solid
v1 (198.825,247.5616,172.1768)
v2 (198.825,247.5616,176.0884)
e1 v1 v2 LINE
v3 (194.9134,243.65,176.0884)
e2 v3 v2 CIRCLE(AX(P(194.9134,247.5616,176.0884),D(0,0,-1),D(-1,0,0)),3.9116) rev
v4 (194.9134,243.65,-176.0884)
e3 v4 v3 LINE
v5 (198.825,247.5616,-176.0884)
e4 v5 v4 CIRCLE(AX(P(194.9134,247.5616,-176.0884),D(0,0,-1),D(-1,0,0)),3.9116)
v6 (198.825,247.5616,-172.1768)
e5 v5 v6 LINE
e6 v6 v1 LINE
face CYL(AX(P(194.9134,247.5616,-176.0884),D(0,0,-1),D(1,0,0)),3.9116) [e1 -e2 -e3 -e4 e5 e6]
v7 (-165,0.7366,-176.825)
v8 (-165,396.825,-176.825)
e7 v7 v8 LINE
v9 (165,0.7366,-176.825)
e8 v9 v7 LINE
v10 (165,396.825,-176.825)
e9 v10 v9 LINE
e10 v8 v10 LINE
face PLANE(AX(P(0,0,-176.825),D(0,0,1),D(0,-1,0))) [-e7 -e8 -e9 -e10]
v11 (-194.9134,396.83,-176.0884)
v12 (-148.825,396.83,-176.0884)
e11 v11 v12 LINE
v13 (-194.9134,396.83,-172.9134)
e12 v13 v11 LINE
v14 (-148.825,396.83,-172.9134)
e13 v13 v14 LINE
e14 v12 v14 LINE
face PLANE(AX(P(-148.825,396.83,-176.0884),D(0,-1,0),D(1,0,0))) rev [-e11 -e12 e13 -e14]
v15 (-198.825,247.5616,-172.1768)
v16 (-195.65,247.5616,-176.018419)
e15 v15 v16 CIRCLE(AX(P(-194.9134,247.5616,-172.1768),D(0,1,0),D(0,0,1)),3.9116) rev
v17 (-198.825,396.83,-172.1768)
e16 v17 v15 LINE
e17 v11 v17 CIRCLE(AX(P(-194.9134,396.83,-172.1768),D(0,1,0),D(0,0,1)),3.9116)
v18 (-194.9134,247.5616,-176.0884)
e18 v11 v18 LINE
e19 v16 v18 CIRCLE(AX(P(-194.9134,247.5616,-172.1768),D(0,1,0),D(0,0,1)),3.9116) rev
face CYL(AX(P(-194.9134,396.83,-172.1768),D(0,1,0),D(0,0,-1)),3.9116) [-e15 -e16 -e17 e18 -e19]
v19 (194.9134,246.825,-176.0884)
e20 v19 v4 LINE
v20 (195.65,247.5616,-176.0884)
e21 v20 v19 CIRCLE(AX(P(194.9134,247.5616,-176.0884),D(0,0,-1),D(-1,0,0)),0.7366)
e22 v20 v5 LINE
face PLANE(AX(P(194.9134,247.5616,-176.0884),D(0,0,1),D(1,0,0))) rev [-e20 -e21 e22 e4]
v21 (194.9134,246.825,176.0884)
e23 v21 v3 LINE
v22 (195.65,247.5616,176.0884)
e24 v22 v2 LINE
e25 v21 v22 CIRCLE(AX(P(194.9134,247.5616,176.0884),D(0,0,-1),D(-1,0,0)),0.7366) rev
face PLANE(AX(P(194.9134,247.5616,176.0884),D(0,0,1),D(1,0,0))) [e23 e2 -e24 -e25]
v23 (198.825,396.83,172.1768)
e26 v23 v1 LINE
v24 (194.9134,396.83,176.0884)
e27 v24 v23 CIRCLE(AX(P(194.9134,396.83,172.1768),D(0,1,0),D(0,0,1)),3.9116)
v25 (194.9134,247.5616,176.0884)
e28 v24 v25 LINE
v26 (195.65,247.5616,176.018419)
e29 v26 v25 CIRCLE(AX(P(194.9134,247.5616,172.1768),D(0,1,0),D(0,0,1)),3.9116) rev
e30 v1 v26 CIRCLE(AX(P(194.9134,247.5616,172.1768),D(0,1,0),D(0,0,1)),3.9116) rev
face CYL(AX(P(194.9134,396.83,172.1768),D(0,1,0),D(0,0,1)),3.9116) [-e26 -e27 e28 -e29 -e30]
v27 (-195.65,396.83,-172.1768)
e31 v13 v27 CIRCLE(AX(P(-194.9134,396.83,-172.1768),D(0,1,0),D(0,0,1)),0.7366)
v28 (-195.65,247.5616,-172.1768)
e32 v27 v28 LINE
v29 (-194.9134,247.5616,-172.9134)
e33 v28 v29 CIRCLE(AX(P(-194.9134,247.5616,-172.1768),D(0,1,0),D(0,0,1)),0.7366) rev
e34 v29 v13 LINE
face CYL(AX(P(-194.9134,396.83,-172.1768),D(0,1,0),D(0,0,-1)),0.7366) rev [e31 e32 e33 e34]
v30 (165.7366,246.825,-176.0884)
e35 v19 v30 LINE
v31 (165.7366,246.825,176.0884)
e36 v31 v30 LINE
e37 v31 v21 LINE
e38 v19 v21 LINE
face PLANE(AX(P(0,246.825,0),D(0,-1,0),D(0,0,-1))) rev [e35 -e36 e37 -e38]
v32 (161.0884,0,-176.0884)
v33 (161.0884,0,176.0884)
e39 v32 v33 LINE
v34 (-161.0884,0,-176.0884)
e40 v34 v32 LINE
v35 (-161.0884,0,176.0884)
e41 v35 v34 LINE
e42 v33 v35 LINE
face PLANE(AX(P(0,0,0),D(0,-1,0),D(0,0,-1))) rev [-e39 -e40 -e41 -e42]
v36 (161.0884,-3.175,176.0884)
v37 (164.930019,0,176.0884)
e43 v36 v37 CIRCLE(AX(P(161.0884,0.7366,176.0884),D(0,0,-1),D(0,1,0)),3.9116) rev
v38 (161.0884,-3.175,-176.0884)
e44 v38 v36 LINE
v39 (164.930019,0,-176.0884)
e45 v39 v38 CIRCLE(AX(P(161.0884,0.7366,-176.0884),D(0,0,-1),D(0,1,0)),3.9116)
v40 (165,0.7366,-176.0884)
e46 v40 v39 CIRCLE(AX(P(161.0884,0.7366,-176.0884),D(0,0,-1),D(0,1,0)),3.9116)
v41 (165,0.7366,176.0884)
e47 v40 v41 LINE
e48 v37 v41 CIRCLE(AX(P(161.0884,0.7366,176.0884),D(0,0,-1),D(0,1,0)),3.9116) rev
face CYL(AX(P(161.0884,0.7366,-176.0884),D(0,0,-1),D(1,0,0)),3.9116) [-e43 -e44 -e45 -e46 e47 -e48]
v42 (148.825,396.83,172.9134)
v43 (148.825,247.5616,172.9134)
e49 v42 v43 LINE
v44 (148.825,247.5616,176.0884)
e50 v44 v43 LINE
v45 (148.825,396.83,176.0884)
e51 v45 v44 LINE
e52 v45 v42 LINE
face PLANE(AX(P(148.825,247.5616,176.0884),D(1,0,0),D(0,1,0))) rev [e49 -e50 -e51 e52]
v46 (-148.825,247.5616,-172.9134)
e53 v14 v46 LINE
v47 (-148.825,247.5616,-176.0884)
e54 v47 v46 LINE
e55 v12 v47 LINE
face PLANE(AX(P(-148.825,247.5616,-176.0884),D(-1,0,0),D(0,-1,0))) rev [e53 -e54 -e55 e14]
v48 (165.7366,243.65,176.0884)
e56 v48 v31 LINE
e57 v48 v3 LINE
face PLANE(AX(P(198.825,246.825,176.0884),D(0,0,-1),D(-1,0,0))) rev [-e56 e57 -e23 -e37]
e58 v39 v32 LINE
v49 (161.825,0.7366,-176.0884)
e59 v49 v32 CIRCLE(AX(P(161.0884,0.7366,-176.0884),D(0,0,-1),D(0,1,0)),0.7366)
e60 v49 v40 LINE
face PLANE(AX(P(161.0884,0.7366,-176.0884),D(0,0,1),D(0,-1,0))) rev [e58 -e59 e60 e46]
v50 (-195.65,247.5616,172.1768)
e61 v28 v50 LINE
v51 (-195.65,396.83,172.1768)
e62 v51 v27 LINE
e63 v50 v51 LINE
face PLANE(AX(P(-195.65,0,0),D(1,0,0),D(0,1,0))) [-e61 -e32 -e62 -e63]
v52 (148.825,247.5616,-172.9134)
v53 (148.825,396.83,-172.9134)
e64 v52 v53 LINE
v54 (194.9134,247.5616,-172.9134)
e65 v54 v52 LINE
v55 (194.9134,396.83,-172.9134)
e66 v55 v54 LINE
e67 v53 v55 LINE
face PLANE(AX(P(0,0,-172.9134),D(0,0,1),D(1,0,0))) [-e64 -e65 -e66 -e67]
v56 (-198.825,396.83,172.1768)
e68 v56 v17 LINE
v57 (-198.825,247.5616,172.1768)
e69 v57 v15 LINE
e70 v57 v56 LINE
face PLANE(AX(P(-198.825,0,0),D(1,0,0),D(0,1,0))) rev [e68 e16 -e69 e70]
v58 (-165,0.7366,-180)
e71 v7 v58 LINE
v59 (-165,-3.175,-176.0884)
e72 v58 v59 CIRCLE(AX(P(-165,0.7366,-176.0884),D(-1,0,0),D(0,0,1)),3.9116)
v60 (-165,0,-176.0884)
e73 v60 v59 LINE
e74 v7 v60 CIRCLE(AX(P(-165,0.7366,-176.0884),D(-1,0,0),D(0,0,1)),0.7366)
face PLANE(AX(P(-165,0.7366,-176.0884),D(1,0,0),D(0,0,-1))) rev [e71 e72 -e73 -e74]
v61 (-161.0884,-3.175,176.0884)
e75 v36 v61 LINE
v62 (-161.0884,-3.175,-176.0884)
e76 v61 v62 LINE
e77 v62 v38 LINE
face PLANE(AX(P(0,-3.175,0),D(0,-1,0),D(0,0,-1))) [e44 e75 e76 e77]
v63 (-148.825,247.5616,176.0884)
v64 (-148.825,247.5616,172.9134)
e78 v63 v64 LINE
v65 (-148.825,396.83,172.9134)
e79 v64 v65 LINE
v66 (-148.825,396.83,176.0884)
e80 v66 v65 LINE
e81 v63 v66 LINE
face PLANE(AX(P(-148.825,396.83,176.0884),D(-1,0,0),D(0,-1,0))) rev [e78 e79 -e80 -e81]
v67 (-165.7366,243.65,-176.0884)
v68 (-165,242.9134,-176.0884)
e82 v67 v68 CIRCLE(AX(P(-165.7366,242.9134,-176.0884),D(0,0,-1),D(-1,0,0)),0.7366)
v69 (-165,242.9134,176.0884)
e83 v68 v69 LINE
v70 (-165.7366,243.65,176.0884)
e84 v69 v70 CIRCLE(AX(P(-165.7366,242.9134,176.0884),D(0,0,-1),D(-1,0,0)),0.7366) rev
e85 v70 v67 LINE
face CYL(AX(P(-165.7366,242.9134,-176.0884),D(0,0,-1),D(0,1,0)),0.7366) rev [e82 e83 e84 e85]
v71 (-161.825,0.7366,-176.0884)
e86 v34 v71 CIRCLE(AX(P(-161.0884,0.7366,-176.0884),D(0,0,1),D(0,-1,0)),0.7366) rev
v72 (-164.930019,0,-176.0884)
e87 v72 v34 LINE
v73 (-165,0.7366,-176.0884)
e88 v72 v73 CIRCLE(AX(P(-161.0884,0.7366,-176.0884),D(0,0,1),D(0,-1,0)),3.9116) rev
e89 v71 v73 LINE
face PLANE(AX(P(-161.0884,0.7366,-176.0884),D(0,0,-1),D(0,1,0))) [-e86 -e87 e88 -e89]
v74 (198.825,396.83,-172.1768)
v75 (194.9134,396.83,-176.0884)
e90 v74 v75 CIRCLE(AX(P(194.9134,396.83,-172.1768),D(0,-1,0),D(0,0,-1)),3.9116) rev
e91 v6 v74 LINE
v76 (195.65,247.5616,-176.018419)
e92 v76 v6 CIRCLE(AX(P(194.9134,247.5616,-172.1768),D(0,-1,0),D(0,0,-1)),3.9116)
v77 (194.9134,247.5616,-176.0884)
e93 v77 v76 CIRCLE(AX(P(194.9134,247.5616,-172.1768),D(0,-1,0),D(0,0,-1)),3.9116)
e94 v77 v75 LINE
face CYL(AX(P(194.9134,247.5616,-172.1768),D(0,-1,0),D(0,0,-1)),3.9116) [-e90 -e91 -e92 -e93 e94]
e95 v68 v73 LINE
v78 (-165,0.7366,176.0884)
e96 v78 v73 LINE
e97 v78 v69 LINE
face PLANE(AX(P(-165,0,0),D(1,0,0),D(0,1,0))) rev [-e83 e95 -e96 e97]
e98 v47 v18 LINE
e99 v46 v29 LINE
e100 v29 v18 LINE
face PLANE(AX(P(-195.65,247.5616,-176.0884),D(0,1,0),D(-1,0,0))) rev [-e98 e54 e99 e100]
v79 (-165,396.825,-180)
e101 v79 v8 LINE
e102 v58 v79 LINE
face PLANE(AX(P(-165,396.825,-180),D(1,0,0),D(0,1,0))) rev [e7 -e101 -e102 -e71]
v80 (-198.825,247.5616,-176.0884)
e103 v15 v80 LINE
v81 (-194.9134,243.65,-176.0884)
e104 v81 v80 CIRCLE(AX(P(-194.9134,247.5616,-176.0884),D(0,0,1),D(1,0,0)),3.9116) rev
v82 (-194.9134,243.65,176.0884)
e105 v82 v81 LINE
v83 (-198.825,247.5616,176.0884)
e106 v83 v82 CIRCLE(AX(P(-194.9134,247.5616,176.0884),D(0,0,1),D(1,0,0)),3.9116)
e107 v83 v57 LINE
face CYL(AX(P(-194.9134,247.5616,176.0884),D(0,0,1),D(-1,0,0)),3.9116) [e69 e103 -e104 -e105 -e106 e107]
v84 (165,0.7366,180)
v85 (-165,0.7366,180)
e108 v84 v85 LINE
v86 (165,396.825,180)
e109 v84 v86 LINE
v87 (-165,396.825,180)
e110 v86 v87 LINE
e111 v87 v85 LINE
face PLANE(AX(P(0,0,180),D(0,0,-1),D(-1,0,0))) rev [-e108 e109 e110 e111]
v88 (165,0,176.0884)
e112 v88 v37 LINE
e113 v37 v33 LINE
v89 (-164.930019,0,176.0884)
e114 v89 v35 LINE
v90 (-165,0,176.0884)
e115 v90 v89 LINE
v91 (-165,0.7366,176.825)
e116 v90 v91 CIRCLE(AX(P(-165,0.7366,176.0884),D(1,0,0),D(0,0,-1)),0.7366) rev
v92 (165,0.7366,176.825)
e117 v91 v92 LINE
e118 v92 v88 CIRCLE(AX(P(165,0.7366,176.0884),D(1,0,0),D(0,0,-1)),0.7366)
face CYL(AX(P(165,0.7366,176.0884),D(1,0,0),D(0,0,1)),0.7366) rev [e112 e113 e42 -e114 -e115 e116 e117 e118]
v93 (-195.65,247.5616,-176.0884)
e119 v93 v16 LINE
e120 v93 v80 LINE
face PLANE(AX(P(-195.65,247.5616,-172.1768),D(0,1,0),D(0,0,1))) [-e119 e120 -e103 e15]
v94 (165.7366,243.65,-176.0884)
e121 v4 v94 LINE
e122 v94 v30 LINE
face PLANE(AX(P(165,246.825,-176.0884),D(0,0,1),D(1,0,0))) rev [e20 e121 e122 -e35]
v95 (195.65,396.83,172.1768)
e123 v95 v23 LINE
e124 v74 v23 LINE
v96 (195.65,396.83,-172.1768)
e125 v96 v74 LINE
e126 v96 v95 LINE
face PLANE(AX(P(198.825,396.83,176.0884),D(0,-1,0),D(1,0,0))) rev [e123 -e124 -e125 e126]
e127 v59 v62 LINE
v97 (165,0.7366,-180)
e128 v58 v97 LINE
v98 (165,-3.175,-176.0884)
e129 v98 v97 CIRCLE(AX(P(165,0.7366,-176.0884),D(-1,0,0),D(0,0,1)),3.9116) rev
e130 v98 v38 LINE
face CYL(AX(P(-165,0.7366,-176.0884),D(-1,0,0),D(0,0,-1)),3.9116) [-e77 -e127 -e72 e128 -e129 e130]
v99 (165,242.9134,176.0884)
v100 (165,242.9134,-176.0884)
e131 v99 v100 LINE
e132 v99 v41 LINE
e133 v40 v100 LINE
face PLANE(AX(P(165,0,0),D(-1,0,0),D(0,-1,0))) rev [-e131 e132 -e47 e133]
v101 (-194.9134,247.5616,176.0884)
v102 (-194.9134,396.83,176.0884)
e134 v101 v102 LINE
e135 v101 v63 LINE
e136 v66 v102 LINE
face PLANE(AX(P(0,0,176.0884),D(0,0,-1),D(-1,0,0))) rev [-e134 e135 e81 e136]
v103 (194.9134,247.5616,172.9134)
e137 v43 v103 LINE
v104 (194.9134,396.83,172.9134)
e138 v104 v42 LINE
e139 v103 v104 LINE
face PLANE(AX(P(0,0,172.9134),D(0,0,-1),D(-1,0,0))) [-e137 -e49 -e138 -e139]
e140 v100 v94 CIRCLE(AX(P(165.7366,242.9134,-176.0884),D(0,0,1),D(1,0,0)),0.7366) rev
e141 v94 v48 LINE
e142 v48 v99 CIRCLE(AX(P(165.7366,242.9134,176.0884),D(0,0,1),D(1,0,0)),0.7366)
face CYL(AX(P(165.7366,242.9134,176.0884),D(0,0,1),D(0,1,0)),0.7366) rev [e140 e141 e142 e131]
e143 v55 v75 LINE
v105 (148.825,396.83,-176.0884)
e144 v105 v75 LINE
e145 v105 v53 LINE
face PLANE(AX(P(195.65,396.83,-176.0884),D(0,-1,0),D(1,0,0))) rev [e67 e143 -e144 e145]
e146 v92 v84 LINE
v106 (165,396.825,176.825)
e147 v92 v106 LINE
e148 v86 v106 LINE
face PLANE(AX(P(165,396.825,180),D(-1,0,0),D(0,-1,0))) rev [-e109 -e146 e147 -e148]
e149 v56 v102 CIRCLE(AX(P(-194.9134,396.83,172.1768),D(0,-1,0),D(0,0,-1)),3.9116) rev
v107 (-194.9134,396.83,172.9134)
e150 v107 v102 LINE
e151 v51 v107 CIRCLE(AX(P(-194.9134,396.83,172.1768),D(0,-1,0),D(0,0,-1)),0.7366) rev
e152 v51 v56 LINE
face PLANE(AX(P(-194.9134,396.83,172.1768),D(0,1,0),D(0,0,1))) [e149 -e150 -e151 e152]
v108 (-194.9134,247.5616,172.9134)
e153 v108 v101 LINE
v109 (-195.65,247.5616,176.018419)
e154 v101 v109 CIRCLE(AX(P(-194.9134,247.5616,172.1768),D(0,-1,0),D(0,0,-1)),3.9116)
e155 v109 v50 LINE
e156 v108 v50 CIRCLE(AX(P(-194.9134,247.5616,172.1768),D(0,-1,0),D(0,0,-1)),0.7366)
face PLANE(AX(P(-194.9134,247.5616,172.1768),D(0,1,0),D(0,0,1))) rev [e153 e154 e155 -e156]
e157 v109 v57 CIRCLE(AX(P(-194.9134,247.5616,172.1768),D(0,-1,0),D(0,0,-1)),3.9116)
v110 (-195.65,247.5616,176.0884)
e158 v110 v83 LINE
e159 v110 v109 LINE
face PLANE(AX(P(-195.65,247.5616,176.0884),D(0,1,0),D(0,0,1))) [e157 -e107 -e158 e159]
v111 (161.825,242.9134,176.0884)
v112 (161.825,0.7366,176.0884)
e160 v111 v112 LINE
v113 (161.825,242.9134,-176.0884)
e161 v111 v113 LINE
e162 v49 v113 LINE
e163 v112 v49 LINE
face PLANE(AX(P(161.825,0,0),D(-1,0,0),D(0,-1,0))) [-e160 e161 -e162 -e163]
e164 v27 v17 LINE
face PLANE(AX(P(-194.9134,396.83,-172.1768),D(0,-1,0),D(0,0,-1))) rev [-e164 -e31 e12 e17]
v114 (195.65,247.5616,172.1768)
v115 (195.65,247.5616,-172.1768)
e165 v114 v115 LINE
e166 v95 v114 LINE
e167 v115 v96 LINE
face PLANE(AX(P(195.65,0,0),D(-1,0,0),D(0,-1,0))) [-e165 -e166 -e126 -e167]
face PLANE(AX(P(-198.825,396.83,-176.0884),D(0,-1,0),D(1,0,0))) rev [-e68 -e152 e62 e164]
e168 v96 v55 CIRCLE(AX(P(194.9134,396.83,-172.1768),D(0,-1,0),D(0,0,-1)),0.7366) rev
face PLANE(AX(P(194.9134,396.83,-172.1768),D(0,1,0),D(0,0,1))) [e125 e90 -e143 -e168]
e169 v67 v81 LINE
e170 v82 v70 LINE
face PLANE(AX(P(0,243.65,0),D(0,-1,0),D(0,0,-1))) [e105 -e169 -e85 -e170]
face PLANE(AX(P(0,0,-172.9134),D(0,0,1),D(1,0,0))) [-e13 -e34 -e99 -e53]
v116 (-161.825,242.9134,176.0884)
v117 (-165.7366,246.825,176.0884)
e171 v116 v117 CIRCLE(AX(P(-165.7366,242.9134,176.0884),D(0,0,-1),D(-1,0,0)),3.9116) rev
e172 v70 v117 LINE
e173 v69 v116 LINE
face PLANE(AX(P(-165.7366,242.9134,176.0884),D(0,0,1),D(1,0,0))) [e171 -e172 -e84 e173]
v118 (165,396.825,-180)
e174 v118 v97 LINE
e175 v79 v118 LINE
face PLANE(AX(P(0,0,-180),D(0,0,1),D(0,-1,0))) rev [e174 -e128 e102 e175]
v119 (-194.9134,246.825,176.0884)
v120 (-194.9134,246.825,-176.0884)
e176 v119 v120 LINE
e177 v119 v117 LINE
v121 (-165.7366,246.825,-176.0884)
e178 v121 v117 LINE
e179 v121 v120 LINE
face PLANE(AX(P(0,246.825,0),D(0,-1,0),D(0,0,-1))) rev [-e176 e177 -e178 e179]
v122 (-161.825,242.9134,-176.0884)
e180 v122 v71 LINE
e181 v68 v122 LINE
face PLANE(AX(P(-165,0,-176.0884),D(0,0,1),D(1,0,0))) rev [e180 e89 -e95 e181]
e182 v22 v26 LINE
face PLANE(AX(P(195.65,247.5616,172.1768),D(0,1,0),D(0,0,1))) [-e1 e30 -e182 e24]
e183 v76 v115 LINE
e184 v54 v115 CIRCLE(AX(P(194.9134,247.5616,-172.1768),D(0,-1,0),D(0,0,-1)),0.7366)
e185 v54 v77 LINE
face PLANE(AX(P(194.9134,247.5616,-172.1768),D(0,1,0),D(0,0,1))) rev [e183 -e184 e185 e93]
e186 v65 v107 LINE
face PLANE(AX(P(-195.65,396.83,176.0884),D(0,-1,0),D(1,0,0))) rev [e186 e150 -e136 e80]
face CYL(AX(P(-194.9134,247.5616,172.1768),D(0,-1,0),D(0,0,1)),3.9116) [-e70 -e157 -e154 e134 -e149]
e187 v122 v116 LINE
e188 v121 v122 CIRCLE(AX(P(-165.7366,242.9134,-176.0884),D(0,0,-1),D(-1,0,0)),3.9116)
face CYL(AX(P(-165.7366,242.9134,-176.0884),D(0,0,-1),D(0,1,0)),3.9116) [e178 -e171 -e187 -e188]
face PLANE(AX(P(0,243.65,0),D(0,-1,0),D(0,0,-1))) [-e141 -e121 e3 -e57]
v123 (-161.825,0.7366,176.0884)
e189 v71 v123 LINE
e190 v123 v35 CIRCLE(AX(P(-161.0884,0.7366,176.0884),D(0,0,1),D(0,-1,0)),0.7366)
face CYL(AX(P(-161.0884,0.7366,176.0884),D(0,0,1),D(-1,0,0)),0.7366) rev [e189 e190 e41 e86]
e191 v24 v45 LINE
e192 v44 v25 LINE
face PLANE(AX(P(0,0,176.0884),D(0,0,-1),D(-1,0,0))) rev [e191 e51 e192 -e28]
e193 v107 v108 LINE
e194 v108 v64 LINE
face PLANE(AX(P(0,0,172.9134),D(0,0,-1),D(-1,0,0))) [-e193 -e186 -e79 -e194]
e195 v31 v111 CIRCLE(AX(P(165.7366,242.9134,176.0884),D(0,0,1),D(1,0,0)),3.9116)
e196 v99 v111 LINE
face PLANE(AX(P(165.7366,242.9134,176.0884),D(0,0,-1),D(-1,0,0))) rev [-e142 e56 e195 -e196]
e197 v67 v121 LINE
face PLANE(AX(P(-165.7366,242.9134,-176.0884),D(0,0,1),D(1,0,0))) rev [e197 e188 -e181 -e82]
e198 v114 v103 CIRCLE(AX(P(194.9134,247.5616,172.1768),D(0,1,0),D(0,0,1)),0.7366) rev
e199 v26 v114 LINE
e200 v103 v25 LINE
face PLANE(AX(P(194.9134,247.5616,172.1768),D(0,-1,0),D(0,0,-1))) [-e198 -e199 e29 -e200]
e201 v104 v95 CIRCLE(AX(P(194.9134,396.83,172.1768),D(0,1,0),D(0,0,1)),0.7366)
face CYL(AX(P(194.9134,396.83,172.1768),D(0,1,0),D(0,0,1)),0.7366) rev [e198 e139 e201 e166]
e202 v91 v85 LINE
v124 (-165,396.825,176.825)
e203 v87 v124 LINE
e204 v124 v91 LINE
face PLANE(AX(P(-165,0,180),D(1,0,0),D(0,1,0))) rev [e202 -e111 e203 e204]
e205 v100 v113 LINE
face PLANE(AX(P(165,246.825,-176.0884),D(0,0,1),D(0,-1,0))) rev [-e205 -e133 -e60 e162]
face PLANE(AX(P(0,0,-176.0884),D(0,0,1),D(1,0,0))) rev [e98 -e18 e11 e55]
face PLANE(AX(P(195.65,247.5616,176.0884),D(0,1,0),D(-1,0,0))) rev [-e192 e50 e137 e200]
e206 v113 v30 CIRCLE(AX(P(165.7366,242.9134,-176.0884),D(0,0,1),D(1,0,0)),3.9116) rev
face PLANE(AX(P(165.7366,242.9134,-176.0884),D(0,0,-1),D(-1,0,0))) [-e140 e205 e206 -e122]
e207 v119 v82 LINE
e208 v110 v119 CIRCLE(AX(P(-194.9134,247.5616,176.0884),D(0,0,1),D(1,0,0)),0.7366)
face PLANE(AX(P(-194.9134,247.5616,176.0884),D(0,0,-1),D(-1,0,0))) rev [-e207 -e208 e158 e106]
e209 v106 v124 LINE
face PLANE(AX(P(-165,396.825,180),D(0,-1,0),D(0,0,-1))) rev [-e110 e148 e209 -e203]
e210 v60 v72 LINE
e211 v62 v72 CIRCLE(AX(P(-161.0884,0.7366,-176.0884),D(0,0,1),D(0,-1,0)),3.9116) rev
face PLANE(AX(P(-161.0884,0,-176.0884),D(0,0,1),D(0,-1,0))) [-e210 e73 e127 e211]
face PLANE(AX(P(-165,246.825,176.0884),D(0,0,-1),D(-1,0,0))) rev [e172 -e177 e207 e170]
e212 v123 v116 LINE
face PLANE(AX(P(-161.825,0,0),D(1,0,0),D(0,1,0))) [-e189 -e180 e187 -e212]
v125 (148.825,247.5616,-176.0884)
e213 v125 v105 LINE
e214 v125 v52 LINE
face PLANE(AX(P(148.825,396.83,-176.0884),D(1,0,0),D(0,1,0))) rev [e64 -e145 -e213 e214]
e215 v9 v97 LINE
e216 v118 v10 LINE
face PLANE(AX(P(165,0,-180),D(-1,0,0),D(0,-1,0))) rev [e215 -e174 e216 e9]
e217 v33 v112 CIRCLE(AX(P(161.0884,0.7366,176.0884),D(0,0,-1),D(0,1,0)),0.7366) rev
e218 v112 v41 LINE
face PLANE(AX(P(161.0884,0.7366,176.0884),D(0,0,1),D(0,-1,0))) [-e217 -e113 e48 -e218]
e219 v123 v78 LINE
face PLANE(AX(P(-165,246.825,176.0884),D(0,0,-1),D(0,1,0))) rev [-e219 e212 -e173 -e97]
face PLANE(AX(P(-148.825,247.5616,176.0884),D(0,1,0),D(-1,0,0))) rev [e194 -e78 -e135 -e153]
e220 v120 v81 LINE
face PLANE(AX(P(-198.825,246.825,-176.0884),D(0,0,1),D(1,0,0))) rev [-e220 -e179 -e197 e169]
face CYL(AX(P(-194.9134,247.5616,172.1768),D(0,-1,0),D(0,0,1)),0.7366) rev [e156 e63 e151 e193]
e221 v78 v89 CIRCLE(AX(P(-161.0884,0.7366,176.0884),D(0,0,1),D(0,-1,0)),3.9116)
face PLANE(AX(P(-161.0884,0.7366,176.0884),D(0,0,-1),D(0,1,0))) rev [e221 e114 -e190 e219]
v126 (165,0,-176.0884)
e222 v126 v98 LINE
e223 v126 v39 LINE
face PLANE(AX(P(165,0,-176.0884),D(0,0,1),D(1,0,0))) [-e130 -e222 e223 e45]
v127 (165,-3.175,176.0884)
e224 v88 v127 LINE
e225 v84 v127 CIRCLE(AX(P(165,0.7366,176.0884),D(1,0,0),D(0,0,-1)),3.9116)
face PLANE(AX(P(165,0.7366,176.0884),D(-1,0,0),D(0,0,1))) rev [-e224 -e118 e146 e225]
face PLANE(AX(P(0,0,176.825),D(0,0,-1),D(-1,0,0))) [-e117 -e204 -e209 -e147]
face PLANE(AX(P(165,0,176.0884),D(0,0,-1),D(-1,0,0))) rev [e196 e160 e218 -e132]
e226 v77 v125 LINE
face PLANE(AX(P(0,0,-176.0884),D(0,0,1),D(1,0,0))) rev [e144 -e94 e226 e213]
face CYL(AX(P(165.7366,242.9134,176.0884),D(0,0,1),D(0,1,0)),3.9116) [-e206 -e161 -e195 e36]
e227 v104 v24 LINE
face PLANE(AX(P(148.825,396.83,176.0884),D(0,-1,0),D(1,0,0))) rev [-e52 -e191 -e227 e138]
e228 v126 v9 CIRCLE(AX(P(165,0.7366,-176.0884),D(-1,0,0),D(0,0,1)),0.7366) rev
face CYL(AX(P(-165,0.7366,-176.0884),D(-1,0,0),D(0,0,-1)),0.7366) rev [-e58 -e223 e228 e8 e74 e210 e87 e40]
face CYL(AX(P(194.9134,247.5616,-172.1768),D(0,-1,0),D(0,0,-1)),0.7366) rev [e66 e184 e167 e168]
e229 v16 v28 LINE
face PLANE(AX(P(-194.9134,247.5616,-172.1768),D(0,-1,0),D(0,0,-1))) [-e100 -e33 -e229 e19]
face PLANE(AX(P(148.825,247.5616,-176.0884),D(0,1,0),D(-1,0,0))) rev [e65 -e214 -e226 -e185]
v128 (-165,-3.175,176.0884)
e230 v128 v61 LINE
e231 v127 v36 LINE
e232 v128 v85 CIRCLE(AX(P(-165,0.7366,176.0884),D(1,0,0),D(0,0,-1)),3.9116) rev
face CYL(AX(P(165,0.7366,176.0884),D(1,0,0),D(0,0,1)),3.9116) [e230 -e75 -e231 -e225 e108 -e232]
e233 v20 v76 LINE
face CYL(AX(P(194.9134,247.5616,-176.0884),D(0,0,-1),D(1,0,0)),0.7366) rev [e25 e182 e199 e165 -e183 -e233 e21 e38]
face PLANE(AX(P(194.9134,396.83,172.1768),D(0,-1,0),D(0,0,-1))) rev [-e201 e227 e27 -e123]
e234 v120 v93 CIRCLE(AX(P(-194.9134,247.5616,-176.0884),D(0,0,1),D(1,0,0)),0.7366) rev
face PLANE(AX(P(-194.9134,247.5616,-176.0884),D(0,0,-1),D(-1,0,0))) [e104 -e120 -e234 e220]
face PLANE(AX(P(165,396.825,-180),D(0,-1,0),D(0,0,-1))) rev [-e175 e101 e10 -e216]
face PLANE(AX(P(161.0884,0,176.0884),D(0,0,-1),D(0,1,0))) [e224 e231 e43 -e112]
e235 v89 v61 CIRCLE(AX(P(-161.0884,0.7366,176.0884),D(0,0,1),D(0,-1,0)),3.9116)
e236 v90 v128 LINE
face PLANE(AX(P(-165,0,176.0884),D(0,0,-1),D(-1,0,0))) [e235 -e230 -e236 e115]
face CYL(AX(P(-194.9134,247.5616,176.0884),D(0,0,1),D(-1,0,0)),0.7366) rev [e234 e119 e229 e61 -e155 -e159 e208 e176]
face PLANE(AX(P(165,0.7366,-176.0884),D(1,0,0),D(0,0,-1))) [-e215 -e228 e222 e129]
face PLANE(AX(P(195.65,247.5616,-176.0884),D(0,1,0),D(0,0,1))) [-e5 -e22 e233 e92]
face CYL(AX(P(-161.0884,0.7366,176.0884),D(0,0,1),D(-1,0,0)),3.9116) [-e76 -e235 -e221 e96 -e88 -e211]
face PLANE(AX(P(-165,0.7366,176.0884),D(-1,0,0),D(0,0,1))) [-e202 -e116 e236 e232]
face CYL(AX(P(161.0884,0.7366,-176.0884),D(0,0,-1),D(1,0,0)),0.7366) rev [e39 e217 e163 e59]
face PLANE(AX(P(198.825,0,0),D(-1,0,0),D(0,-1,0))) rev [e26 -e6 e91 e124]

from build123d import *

# Parameters (mm, degrees)
SKETCH6_W                       = 330
SKETCH6_H                       = 360
BASE_FLANGE2_DEPTH              = 3.175
EDGE_FLANGE4_STRIP_W            = 14.1732
EDGE_FLANGE4_STRIP_H            = 3.175
EDGE_FLANGE4_STRIP_CUT_DEPTH    = 330
EDGE_FLANGE4_DEPTH              = 330
EDGE_FLANGE5_STRIP_W            = 14.1732
EDGE_FLANGE5_STRIP_H            = 3.175
EDGE_FLANGE5_STRIP_CUT_DEPTH    = 330
EDGE_FLANGE5_DEPTH              = 330
EDGE_FLANGE6_STRIP_W            = 14.1732
EDGE_FLANGE6_STRIP_H            = 3.175
EDGE_FLANGE6_STRIP_CUT_DEPTH    = 352.1768
EDGE_FLANGE6_DEPTH              = 352.1768
EDGE_FLANGE7_STRIP_W            = 14.1732
EDGE_FLANGE7_STRIP_H            = 3.175
EDGE_FLANGE7_STRIP_CUT_DEPTH    = 352.1768
EDGE_FLANGE7_DEPTH              = 352.1768
EDGE_FLANGE10_STRIP_W           = 14.1732
EDGE_FLANGE10_STRIP_H           = 3.175
EDGE_FLANGE10_STRIP_CUT_DEPTH   = 352.1768
EDGE_FLANGE10_DEPTH             = 352.1768
EDGE_FLANGE11_STRIP_W           = 14.1732
EDGE_FLANGE11_STRIP_H           = 3.175
EDGE_FLANGE11_STRIP_CUT_DEPTH   = 352.1768
EDGE_FLANGE11_DEPTH             = 352.1768
EDGE_FLANGE12_STRIP_W           = 14.1732
EDGE_FLANGE12_STRIP_H           = 3.175
EDGE_FLANGE12_STRIP_CUT_DEPTH   = 352.1768
EDGE_FLANGE12_DEPTH             = 352.1768
EDGE_FLANGE13_STRIP_W           = 14.1732
EDGE_FLANGE13_STRIP_H           = 3.175
EDGE_FLANGE13_STRIP_CUT_DEPTH   = 352.1768
EDGE_FLANGE13_DEPTH             = 352.1768
EDGE_FLANGE14_STRIP_W           = 14.1732
EDGE_FLANGE14_STRIP_H           = 3.175
EDGE_FLANGE14_STRIP_CUT_DEPTH   = 149.2684
EDGE_FLANGE14_STRIP_2_W         = 14.1732
EDGE_FLANGE14_STRIP_2_H         = 3.175
EDGE_FLANGE14_STRIP_CUT_2_DEPTH = 149.2684
EDGE_FLANGE14_STRIP_3_W         = 14.1732
EDGE_FLANGE14_STRIP_3_H         = 3.175
EDGE_FLANGE14_STRIP_CUT_3_DEPTH = 149.2684
EDGE_FLANGE14_STRIP_4_W         = 14.1732
EDGE_FLANGE14_STRIP_4_H         = 3.175
EDGE_FLANGE14_STRIP_CUT_4_DEPTH = 149.2684
EDGE_FLANGE14_DEPTH             = 149.2684
EDGE_FLANGE14_BEND_DEPTH        = 149.2684
EDGE_FLANGE14_BEND_2_DEPTH      = 149.2684
EDGE_FLANGE14_BEND_3_DEPTH      = 149.2684


# Sheet-metal steps are written as plain solids
with BuildPart() as part:
    # Sketch6 → Base-Flange2 (new body)
    with BuildSketch(Plane(origin=(0, 0, 0), x_dir=(1, 0, 0), z_dir=(0, 1, 0))):
        Rectangle(SKETCH6_W, SKETCH6_H)
    extrude(amount=-BASE_FLANGE2_DEPTH)

    # Edge-Flange4 strip (across the edge) → Edge-Flange4 strip cut (cut)
    with BuildSketch(Plane(origin=(-165, 0, 180), x_dir=(0, 0, -1), z_dir=(1, 0, 0))):
        with Locations((-3.175, -1.5875)):
            Rectangle(EDGE_FLANGE4_STRIP_W, EDGE_FLANGE4_STRIP_H)
    extrude(amount=EDGE_FLANGE4_STRIP_CUT_DEPTH, mode=Mode.SUBTRACT)

    # Edge-Flange4 section (across the edge) → Edge-Flange4 (add)
    with BuildSketch(Plane(origin=(-165, 0, 180), x_dir=(0, 0, -1), z_dir=(1, 0, 0))):
        with BuildLine():
            Line((0, 0.7366), (0, 396.825))
            Line((0, 396.825), (3.175, 396.825))
            Line((3.175, 396.825), (3.175, 0.7366))
            ThreePointArc((3.175, 0.7366), (3.390745145, 0.215745145), (3.9116, 0))
            Line((3.9116, 0), (3.9116, -3.175))
            ThreePointArc((3.9116, -3.175), (1.145681115, -2.029318885), (0, 0.7366))
        make_face()
    extrude(amount=EDGE_FLANGE4_DEPTH)

    # Edge-Flange5 strip (across the edge) → Edge-Flange5 strip cut (cut)
    with BuildSketch(Plane(origin=(165, 0, -180), x_dir=(0, 0, 1), z_dir=(-1, 0, 0))):
        with Locations((-3.175, -1.5875)):
            Rectangle(EDGE_FLANGE5_STRIP_W, EDGE_FLANGE5_STRIP_H)
    extrude(amount=EDGE_FLANGE5_STRIP_CUT_DEPTH, mode=Mode.SUBTRACT)

    # Edge-Flange5 section (across the edge) → Edge-Flange5 (add)
    with BuildSketch(Plane(origin=(165, 0, -180), x_dir=(0, 0, 1), z_dir=(-1, 0, 0))):
        with BuildLine():
            Line((0, 0.7366), (0, 396.825))
            Line((0, 396.825), (3.175, 396.825))
            Line((3.175, 396.825), (3.175, 0.7366))
            ThreePointArc((3.175, 0.7366), (3.390745145, 0.215745145), (3.9116, 0))
            Line((3.9116, 0), (3.9116, -3.175))
            ThreePointArc((3.9116, -3.175), (1.145681115, -2.029318885), (0, 0.7366))
        make_face()
    extrude(amount=EDGE_FLANGE5_DEPTH)

    # Edge-Flange6 strip (across the edge) → Edge-Flange6 strip cut (cut)
    with BuildSketch(Plane(origin=(165, 0, 176.0884), x_dir=(-1, 0, 0), z_dir=(0, 0, -1))):
        with Locations((-3.175, -1.5875)):
            Rectangle(EDGE_FLANGE6_STRIP_W, EDGE_FLANGE6_STRIP_H)
    extrude(amount=EDGE_FLANGE6_STRIP_CUT_DEPTH, mode=Mode.SUBTRACT)

    # Edge-Flange6 section (across the edge) → Edge-Flange6 (add)
    with BuildSketch(Plane(origin=(165, 0, 176.0884), x_dir=(-1, 0, 0), z_dir=(0, 0, -1))):
        with BuildLine():
            Line((0, 0.7366), (0, 246.825))
            Line((0, 246.825), (3.175, 246.825))
            Line((3.175, 246.825), (3.175, 0.7366))
            ThreePointArc((3.175, 0.7366), (3.390745145, 0.215745145), (3.9116, 0))
            Line((3.9116, 0), (3.9116, -3.175))
            ThreePointArc((3.9116, -3.175), (1.145681115, -2.029318885), (0, 0.7366))
        make_face()
    extrude(amount=EDGE_FLANGE6_DEPTH)

    # Edge-Flange7 strip (across the edge) → Edge-Flange7 strip cut (cut)
    with BuildSketch(Plane(origin=(-165, 0, -176.0884), x_dir=(1, 0, 0), z_dir=(0, 0, 1))):
        with Locations((-3.175, -1.5875)):
            Rectangle(EDGE_FLANGE7_STRIP_W, EDGE_FLANGE7_STRIP_H)
    extrude(amount=EDGE_FLANGE7_STRIP_CUT_DEPTH, mode=Mode.SUBTRACT)

    # Edge-Flange7 section (across the edge) → Edge-Flange7 (add)
    with BuildSketch(Plane(origin=(-165, 0, -176.0884), x_dir=(1, 0, 0), z_dir=(0, 0, 1))):
        with BuildLine():
            Line((0, 0.7366), (0, 246.825))
            Line((0, 246.825), (3.175, 246.825))
            Line((3.175, 246.825), (3.175, 0.7366))
            ThreePointArc((3.175, 0.7366), (3.390745145, 0.215745145), (3.9116, 0))
            Line((3.9116, 0), (3.9116, -3.175))
            ThreePointArc((3.9116, -3.175), (1.145681115, -2.029318885), (0, 0.7366))
        make_face()
    extrude(amount=EDGE_FLANGE7_DEPTH)

    # Edge-Flange10 strip (across the edge) → Edge-Flange10 strip cut (cut)
    with BuildSketch(Plane(origin=(-165, 246.825, 176.0884), x_dir=(0, -1, 0), z_dir=(0, 0, -1))):
        with Locations((-3.175, -1.5875)):
            Rectangle(EDGE_FLANGE10_STRIP_W, EDGE_FLANGE10_STRIP_H)
    extrude(amount=EDGE_FLANGE10_STRIP_CUT_DEPTH, mode=Mode.SUBTRACT)

    # Edge-Flange10 section (across the edge) → Edge-Flange10 (add)
    with BuildSketch(Plane(origin=(-165, 246.825, 176.0884), x_dir=(0, -1, 0), z_dir=(0, 0, -1))):
        with BuildLine():
            Line((0, 0.7366), (0, 33.825))
            Line((0, 33.825), (3.175, 33.825))
            Line((3.175, 33.825), (3.175, 0.7366))
            ThreePointArc((3.175, 0.7366), (3.390745145, 0.215745145), (3.9116, 0))
            Line((3.9116, 0), (3.9116, -3.175))
            ThreePointArc((3.9116, -3.175), (1.145681115, -2.029318885), (0, 0.7366))
        make_face()
    extrude(amount=EDGE_FLANGE10_DEPTH)

    # Edge-Flange11 strip (across the edge) → Edge-Flange11 strip cut (cut)
    with BuildSketch(Plane(origin=(165, 246.825, -176.0884), x_dir=(0, -1, 0), z_dir=(0, 0, 1))):
        with Locations((-3.175, -1.5875)):
            Rectangle(EDGE_FLANGE11_STRIP_W, EDGE_FLANGE11_STRIP_H)
    extrude(amount=EDGE_FLANGE11_STRIP_CUT_DEPTH, mode=Mode.SUBTRACT)

    # Edge-Flange11 section (across the edge) → Edge-Flange11 (add)
    with BuildSketch(Plane(origin=(165, 246.825, -176.0884), x_dir=(0, -1, 0), z_dir=(0, 0, 1))):
        with BuildLine():
            Line((0, 0.7366), (0, 33.825))
            Line((0, 33.825), (3.175, 33.825))
            Line((3.175, 33.825), (3.175, 0.7366))
            ThreePointArc((3.175, 0.7366), (3.390745145, 0.215745145), (3.9116, 0))
            Line((3.9116, 0), (3.9116, -3.175))
            ThreePointArc((3.9116, -3.175), (1.145681115, -2.029318885), (0, 0.7366))
        make_face()
    extrude(amount=EDGE_FLANGE11_DEPTH)

    # Edge-Flange12 strip (across the edge) → Edge-Flange12 strip cut (cut)
    with BuildSketch(Plane(origin=(-198.825, 246.825, -176.0884), x_dir=(1, 0, 0), z_dir=(0, 0, 1))):
        with Locations((-3.175, -1.5875)):
            Rectangle(EDGE_FLANGE12_STRIP_W, EDGE_FLANGE12_STRIP_H)
    extrude(amount=EDGE_FLANGE12_STRIP_CUT_DEPTH, mode=Mode.SUBTRACT)

    # Edge-Flange12 section (across the edge) → Edge-Flange12 (add)
    with BuildSketch(Plane(origin=(-198.825, 246.825, -176.0884), x_dir=(1, 0, 0), z_dir=(0, 0, 1))):
        with BuildLine():
            Line((0, 0.7366), (0, 150.005))
            Line((0, 150.005), (3.175, 150.005))
            Line((3.175, 150.005), (3.175, 0.7366))
            ThreePointArc((3.175, 0.7366), (3.390745145, 0.215745145), (3.9116, 0))
            Line((3.9116, 0), (3.9116, -3.175))
            ThreePointArc((3.9116, -3.175), (1.145681115, -2.029318885), (0, 0.7366))
        make_face()
    extrude(amount=EDGE_FLANGE12_DEPTH)

    # Edge-Flange13 strip (across the edge) → Edge-Flange13 strip cut (cut)
    with BuildSketch(Plane(origin=(198.825, 246.825, 176.0884), x_dir=(-1, 0, 0), z_dir=(0, 0, -1))):
        with Locations((-3.175, -1.5875)):
            Rectangle(EDGE_FLANGE13_STRIP_W, EDGE_FLANGE13_STRIP_H)
    extrude(amount=EDGE_FLANGE13_STRIP_CUT_DEPTH, mode=Mode.SUBTRACT)

    # Edge-Flange13 section (across the edge) → Edge-Flange13 (add)
    with BuildSketch(Plane(origin=(198.825, 246.825, 176.0884), x_dir=(-1, 0, 0), z_dir=(0, 0, -1))):
        with BuildLine():
            Line((0, 0.7366), (0, 150.005))
            Line((0, 150.005), (3.175, 150.005))
            Line((3.175, 150.005), (3.175, 0.7366))
            ThreePointArc((3.175, 0.7366), (3.390745145, 0.215745145), (3.9116, 0))
            Line((3.9116, 0), (3.9116, -3.175))
            ThreePointArc((3.9116, -3.175), (1.145681115, -2.029318885), (0, 0.7366))
        make_face()
    extrude(amount=EDGE_FLANGE13_DEPTH)

    # Edge-Flange14 strip (across the edge) → Edge-Flange14 strip cut (cut)
    with BuildSketch(Plane(origin=(-195.65, 396.83, 176.0884), x_dir=(0, 0, -1), z_dir=(0, -1, 0))):
        with Locations((-3.175, -1.5875)):
            Rectangle(EDGE_FLANGE14_STRIP_W, EDGE_FLANGE14_STRIP_H)
    extrude(amount=EDGE_FLANGE14_STRIP_CUT_DEPTH, mode=Mode.SUBTRACT)

    # Edge-Flange14 strip 2 (across the edge) → Edge-Flange14 strip cut 2 (cut)
    with BuildSketch(Plane(origin=(-195.65, 247.5616, -176.0884), x_dir=(0, 0, 1), z_dir=(0, 1, 0))):
        with Locations((-3.175, -1.5875)):
            Rectangle(EDGE_FLANGE14_STRIP_2_W, EDGE_FLANGE14_STRIP_2_H)
    extrude(amount=EDGE_FLANGE14_STRIP_CUT_2_DEPTH, mode=Mode.SUBTRACT)

    # Edge-Flange14 strip 3 (across the edge) → Edge-Flange14 strip cut 3 (cut)
    with BuildSketch(Plane(origin=(195.65, 396.83, -176.0884), x_dir=(0, 0, 1), z_dir=(0, -1, 0))):
        with Locations((-3.175, -1.5875)):
            Rectangle(EDGE_FLANGE14_STRIP_3_W, EDGE_FLANGE14_STRIP_3_H)
    extrude(amount=EDGE_FLANGE14_STRIP_CUT_3_DEPTH, mode=Mode.SUBTRACT)

    # Edge-Flange14 strip 4 (across the edge) → Edge-Flange14 strip cut 4 (cut)
    with BuildSketch(Plane(origin=(195.65, 247.5616, 176.0884), x_dir=(0, 0, -1), z_dir=(0, 1, 0))):
        with Locations((-3.175, -1.5875)):
            Rectangle(EDGE_FLANGE14_STRIP_4_W, EDGE_FLANGE14_STRIP_4_H)
    extrude(amount=EDGE_FLANGE14_STRIP_CUT_4_DEPTH, mode=Mode.SUBTRACT)

    # Edge-Flange14 section (across the edge) → Edge-Flange14 (add)
    with BuildSketch(Plane(origin=(-195.65, 396.83, 176.0884), x_dir=(0, 0, -1), z_dir=(0, -1, 0))):
        with BuildLine():
            Line((0, 0.7366), (0, 46.825))
            Line((0, 46.825), (3.175, 46.825))
            Line((3.175, 46.825), (3.175, 0.7366))
            ThreePointArc((3.175, 0.7366), (3.390745145, 0.215745145), (3.9116, 0))
            Line((3.9116, 0), (3.9116, -3.175))
            ThreePointArc((3.9116, -3.175), (1.145681115, -2.029318885), (0, 0.7366))
        make_face()
    extrude(amount=EDGE_FLANGE14_DEPTH)

    # Edge-Flange14 section 2 (across the edge) → Edge-Flange14 bend (add)
    with BuildSketch(Plane(origin=(-195.65, 247.5616, -176.0884), x_dir=(0, 0, 1), z_dir=(0, 1, 0))):
        with BuildLine():
            Line((0, 0.7366), (0, 46.825))
            Line((0, 46.825), (3.175, 46.825))
            Line((3.175, 46.825), (3.175, 0.7366))
            ThreePointArc((3.175, 0.7366), (3.390745145, 0.215745145), (3.9116, 0))
            Line((3.9116, 0), (3.9116, -3.175))
            ThreePointArc((3.9116, -3.175), (1.145681115, -2.029318885), (0, 0.7366))
        make_face()
    extrude(amount=EDGE_FLANGE14_BEND_DEPTH)

    # Edge-Flange14 section 3 (across the edge) → Edge-Flange14 bend 2 (add)
    with BuildSketch(Plane(origin=(195.65, 396.83, -176.0884), x_dir=(0, 0, 1), z_dir=(0, -1, 0))):
        with BuildLine():
            Line((0, 0.7366), (0, 46.825))
            Line((0, 46.825), (3.175, 46.825))
            Line((3.175, 46.825), (3.175, 0.7366))
            ThreePointArc((3.175, 0.7366), (3.390745145, 0.215745145), (3.9116, 0))
            Line((3.9116, 0), (3.9116, -3.175))
            ThreePointArc((3.9116, -3.175), (1.145681115, -2.029318885), (0, 0.7366))
        make_face()
    extrude(amount=EDGE_FLANGE14_BEND_2_DEPTH)

    # Edge-Flange14 section 4 (across the edge) → Edge-Flange14 bend 3 (add)
    with BuildSketch(Plane(origin=(195.65, 247.5616, 176.0884), x_dir=(0, 0, -1), z_dir=(0, 1, 0))):
        with BuildLine():
            Line((0, 0.7366), (0, 46.825))
            Line((0, 46.825), (3.175, 46.825))
            Line((3.175, 46.825), (3.175, 0.7366))
            ThreePointArc((3.175, 0.7366), (3.390745145, 0.215745145), (3.9116, 0))
            Line((3.9116, 0), (3.9116, -3.175))
            ThreePointArc((3.9116, -3.175), (1.145681115, -2.029318885), (0, 0.7366))
        make_face()
    extrude(amount=EDGE_FLANGE14_BEND_3_DEPTH)


solid = part.part
